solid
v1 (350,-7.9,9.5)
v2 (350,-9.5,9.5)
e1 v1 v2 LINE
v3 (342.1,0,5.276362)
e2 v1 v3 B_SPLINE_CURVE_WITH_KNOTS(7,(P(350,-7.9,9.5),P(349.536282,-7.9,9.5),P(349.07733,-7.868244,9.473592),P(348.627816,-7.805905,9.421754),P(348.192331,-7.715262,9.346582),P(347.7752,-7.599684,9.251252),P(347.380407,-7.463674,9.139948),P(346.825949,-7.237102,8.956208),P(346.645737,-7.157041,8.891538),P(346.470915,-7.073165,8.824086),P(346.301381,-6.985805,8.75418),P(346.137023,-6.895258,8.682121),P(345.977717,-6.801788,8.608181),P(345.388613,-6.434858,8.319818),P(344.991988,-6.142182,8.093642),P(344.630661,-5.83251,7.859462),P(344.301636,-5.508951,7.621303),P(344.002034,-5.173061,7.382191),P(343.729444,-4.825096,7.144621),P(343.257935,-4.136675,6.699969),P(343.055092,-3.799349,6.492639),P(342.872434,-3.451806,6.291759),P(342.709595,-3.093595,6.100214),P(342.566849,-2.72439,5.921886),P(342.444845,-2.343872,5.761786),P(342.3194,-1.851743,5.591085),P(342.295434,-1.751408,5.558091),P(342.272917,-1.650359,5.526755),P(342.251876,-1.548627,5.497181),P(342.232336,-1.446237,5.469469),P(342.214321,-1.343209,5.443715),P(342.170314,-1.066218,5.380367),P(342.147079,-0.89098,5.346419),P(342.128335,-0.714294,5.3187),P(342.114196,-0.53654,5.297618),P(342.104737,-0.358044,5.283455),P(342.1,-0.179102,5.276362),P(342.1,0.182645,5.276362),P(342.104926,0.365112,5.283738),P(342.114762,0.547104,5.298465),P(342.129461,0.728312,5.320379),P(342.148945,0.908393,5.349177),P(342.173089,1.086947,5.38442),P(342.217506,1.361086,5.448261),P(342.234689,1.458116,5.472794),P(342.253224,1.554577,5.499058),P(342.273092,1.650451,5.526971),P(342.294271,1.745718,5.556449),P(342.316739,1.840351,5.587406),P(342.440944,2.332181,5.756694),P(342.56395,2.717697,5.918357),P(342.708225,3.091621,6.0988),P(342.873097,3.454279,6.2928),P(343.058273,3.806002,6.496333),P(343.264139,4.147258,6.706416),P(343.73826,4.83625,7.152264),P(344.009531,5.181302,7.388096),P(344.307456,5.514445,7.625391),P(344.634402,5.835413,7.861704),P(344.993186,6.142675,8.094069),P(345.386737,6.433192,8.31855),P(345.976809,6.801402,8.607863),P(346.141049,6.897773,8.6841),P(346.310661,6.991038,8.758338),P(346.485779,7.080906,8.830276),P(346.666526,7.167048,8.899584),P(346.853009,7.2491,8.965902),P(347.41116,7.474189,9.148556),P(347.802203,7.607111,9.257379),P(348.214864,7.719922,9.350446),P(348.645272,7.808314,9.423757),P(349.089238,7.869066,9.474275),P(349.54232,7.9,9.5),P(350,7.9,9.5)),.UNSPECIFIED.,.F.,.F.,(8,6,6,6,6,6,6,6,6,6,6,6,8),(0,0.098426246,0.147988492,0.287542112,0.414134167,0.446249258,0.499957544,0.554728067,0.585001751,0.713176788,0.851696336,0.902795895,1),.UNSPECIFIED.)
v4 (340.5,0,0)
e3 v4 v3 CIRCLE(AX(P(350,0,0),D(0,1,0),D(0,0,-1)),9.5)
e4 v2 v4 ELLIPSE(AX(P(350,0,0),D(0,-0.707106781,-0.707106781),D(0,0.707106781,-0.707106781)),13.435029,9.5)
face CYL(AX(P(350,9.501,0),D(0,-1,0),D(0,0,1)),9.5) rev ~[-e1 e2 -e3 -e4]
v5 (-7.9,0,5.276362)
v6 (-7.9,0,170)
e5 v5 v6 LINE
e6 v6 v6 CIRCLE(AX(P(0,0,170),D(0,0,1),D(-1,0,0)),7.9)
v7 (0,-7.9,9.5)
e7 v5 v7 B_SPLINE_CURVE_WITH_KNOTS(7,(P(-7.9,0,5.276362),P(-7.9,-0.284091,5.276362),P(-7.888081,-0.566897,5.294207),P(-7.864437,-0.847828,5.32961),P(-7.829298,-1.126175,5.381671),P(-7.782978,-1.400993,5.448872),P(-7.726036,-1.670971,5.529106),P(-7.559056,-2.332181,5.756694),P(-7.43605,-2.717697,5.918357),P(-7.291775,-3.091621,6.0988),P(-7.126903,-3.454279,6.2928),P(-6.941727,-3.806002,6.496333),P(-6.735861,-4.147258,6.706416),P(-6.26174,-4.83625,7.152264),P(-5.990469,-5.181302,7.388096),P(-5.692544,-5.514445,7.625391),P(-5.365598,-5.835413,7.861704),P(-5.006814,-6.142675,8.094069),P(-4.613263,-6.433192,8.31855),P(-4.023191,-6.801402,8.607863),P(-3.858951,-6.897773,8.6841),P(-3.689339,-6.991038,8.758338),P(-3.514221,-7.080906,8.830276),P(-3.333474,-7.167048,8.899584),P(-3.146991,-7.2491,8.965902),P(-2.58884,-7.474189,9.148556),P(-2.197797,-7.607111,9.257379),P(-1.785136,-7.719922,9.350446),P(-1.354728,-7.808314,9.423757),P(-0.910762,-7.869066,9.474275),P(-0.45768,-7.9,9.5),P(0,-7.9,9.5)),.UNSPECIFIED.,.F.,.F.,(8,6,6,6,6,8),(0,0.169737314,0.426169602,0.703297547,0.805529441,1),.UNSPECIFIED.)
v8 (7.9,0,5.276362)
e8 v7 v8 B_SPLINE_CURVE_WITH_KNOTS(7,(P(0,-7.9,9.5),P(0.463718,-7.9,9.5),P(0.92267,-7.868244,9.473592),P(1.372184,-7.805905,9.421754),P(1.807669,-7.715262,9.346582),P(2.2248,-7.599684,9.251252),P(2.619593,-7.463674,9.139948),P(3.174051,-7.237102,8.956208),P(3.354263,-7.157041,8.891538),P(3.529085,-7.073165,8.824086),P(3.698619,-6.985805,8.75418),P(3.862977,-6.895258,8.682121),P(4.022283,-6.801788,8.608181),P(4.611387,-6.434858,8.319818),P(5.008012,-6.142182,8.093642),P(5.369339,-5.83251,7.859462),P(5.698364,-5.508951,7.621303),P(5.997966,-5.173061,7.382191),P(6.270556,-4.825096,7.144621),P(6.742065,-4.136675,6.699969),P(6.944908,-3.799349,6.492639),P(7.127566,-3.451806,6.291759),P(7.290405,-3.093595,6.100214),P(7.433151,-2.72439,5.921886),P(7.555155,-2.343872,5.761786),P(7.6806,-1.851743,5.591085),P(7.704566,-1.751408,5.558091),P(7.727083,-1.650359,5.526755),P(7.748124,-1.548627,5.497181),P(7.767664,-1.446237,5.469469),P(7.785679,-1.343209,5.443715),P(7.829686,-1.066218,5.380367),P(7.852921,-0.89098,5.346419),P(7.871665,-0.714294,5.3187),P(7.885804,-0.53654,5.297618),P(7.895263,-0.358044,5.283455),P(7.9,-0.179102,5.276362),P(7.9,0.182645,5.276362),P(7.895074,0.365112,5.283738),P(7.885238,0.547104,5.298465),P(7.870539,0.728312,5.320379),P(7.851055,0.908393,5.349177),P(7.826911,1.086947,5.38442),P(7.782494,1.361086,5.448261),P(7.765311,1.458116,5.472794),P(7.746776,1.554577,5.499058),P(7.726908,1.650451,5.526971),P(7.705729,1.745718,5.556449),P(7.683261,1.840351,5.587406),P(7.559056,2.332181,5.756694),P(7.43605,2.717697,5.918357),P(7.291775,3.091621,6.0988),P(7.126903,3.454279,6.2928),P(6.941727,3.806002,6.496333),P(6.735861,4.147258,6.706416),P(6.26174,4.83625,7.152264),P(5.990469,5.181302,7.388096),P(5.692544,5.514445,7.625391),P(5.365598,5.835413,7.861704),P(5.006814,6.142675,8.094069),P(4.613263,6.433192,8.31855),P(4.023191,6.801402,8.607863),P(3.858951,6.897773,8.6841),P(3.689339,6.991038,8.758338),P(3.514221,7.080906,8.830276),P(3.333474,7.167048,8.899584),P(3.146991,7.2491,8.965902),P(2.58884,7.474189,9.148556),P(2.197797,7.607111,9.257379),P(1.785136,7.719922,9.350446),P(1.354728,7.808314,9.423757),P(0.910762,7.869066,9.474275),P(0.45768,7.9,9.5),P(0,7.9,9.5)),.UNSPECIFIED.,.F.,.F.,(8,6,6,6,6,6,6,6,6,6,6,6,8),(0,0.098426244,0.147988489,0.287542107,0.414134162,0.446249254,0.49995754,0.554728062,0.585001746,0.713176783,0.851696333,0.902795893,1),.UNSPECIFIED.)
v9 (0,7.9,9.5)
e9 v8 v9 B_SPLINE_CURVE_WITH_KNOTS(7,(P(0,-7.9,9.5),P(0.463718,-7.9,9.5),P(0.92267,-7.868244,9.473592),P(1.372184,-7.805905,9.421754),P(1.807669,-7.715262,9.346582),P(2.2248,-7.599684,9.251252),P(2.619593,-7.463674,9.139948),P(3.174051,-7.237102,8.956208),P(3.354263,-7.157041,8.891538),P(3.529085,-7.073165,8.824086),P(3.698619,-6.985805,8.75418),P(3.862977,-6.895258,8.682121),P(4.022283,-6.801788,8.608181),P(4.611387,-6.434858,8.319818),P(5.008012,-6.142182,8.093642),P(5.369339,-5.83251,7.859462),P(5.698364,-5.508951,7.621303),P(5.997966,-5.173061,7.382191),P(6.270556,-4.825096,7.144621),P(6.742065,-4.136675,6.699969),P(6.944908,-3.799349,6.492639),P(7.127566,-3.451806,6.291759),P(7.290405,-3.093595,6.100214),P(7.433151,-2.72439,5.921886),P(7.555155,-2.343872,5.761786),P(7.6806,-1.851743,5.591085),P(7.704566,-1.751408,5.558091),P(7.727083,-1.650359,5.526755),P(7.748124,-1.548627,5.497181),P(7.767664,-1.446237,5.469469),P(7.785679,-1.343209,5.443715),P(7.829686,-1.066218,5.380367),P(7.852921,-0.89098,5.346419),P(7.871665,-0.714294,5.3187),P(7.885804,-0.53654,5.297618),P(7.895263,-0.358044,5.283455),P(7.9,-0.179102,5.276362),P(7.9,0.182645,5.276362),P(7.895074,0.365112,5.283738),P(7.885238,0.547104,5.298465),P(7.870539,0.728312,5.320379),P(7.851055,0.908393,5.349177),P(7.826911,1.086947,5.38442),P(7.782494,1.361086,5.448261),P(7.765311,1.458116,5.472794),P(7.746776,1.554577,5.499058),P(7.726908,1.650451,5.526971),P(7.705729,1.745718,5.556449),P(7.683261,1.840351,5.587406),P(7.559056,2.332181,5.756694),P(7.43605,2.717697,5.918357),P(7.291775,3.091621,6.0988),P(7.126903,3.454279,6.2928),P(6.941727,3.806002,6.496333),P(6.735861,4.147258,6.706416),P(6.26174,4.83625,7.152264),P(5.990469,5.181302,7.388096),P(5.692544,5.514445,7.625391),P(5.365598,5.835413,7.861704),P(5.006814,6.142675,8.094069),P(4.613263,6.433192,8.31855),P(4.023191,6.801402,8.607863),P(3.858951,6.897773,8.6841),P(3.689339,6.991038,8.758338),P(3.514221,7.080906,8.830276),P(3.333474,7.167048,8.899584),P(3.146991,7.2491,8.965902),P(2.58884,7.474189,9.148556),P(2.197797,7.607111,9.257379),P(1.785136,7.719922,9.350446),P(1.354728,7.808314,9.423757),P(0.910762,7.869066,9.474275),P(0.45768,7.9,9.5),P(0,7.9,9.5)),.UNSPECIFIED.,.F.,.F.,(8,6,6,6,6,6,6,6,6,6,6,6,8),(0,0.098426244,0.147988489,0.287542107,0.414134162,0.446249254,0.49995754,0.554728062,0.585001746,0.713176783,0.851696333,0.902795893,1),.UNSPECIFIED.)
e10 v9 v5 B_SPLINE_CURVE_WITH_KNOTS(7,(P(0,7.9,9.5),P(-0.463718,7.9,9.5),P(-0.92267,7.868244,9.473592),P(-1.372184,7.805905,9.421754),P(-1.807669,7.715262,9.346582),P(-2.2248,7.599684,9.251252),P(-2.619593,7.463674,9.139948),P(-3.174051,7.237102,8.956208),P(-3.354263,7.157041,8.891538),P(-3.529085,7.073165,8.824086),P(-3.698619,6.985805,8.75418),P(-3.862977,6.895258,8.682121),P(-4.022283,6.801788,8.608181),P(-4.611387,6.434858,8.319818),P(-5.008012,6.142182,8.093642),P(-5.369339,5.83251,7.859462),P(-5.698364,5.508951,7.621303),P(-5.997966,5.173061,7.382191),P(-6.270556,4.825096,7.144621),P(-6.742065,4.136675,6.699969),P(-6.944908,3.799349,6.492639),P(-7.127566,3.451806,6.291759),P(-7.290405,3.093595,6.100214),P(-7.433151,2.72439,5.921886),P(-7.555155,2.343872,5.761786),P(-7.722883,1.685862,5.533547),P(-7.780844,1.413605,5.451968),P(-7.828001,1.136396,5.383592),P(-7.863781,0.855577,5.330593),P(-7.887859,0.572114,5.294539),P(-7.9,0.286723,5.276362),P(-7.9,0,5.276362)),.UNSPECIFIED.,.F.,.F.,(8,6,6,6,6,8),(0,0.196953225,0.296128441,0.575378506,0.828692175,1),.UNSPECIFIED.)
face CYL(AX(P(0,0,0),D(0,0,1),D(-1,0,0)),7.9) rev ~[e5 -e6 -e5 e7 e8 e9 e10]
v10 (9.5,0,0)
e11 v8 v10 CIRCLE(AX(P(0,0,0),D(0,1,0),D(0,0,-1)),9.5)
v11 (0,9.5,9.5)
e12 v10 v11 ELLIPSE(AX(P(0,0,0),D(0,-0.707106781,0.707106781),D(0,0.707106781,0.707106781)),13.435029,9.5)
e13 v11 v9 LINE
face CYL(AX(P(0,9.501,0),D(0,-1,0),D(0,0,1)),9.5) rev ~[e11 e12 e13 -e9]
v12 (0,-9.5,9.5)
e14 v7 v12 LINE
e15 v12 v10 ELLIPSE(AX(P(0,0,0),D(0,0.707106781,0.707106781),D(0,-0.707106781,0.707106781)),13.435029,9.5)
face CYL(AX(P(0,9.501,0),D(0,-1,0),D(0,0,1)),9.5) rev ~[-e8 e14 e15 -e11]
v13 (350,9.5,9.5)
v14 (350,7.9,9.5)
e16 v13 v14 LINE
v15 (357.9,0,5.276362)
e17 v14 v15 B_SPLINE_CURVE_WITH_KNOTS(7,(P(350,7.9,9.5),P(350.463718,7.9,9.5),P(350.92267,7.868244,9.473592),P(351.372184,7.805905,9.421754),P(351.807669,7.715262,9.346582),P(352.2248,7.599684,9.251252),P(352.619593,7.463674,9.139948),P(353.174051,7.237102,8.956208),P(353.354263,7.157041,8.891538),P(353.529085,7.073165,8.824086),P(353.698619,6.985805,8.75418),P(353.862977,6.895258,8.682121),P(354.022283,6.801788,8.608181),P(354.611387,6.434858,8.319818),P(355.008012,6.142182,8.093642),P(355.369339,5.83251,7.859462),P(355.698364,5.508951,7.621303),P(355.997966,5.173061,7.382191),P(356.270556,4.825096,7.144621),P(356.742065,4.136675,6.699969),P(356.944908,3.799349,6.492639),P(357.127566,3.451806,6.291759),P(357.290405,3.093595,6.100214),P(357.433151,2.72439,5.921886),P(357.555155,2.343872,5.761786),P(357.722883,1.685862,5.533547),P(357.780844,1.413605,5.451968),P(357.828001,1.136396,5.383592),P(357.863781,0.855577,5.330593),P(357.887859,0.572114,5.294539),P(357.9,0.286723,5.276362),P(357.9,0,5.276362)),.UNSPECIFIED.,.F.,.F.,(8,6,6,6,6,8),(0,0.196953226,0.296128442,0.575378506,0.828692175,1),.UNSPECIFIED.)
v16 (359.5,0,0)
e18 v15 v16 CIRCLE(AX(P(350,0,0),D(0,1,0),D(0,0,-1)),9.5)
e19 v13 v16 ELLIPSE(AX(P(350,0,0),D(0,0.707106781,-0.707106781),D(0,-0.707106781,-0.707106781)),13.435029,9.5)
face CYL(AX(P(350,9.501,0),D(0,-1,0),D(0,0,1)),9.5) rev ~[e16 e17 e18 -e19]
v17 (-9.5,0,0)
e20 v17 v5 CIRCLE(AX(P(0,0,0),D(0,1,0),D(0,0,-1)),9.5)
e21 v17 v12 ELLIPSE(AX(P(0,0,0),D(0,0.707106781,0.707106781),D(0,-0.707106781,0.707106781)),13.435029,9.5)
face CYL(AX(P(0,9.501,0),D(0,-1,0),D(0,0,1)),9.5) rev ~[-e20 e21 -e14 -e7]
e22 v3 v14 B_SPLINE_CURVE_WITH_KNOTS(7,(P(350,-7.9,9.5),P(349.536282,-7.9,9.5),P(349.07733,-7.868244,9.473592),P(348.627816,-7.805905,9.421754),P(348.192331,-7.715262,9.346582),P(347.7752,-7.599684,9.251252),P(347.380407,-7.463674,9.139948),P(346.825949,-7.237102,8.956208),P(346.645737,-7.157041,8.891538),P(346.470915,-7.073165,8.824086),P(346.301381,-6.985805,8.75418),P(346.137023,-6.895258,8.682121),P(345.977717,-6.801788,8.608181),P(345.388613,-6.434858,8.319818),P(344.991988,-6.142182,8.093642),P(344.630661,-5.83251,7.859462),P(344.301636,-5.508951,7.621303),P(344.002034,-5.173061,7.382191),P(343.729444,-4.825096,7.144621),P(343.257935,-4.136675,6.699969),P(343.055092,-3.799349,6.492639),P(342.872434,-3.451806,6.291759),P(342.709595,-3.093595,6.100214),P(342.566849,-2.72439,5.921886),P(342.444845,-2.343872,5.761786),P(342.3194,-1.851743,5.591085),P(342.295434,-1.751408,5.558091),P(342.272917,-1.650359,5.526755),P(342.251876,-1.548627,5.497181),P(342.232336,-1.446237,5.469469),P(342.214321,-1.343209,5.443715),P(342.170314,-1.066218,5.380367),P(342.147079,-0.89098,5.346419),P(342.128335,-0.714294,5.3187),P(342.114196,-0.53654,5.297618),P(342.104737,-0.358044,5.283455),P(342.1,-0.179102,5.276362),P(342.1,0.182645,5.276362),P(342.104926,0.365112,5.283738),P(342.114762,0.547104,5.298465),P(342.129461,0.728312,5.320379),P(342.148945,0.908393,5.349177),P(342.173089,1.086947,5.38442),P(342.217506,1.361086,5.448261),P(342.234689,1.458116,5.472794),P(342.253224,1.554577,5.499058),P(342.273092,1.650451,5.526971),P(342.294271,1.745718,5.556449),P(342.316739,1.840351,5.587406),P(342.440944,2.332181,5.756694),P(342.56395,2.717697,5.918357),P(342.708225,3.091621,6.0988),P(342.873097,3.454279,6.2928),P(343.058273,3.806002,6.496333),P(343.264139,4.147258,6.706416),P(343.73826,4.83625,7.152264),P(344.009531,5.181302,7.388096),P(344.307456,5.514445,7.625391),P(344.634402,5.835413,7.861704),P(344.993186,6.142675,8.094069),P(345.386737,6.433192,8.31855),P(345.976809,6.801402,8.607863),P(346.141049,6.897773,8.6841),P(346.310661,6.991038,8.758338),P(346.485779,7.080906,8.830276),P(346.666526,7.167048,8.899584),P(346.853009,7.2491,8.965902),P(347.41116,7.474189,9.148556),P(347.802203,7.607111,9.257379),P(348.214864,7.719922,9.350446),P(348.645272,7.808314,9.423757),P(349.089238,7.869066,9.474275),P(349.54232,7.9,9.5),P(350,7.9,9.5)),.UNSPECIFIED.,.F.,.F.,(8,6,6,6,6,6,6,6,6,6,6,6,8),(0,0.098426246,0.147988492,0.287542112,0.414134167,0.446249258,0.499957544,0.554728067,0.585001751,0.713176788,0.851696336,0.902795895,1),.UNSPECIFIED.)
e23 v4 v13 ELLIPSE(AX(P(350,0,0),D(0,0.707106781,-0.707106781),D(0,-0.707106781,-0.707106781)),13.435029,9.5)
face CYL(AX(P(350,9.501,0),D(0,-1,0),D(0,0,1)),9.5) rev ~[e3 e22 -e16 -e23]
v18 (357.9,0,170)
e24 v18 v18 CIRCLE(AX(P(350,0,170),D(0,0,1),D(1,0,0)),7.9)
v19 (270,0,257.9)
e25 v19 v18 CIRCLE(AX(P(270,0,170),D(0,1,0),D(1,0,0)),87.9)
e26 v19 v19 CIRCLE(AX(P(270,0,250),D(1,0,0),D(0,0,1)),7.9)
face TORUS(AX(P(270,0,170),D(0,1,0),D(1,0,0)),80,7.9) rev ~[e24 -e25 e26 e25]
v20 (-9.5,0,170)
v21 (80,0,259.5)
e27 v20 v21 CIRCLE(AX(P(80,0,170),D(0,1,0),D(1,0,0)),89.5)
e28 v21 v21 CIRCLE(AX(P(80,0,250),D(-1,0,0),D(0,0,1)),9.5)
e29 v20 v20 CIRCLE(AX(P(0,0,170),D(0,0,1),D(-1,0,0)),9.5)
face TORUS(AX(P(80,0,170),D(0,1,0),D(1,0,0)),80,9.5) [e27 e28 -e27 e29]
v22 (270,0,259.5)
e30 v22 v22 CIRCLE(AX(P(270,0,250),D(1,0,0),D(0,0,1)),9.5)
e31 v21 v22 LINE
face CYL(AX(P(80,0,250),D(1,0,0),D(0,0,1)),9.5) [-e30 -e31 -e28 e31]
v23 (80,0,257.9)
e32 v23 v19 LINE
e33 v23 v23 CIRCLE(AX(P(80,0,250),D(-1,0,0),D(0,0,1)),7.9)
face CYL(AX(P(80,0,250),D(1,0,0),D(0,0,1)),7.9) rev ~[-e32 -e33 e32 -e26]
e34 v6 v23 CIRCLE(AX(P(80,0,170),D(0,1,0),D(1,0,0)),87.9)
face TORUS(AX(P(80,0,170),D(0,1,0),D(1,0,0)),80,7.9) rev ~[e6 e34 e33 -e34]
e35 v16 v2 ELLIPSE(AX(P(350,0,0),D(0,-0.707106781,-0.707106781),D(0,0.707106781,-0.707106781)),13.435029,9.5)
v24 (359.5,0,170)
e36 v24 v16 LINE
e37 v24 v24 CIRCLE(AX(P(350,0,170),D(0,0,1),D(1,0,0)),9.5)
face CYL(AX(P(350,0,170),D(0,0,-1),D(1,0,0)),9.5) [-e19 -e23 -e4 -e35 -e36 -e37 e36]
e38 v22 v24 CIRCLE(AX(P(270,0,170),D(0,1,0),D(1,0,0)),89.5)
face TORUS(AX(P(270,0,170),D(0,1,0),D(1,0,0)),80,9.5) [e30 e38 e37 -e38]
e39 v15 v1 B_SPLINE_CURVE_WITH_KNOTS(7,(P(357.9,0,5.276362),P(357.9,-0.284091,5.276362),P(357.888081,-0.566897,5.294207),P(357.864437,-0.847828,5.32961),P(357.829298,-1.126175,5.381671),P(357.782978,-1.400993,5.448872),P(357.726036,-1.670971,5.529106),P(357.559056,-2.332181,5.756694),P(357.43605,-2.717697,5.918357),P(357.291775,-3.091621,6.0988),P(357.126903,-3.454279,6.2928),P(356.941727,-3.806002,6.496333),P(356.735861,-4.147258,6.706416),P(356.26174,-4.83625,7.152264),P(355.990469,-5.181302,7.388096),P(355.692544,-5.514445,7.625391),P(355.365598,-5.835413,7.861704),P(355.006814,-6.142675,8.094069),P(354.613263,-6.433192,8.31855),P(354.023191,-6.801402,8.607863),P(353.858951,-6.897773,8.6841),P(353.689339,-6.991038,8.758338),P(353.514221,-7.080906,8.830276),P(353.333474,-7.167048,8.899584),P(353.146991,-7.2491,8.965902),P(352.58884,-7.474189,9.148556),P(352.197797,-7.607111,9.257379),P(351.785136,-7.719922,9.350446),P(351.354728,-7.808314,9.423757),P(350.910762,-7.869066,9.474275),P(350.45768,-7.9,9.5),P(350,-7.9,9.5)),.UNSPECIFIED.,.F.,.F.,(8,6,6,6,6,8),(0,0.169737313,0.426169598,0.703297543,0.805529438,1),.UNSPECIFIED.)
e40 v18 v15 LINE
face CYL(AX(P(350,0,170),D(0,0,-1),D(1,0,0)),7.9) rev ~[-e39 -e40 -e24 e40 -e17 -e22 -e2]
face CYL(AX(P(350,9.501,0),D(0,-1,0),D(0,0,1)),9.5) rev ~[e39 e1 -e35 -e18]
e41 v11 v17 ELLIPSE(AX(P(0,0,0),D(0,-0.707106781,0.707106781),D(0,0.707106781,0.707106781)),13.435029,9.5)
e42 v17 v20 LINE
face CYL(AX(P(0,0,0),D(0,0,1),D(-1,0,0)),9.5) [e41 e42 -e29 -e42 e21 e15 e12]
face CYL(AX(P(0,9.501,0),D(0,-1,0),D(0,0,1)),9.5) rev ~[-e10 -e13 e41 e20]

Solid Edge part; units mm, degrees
sketch "Sketch1" plane through (0, 0, 0) normal (0, -1, 0) x (1, 0, 0)
  line L0 (0, 0) -> (0, 170)
  arc A0 (0, 170) -> (80, 250) centre (80, 170) cw
  line L1 (80, 250) -> (270, 250)
  arc A1 (270, 250) -> (350, 170) centre (270, 170) cw
  line L2 (350, 170) -> (350, 0)
  dimension "D1" = 350
  dimension "D2" = 80
  dimension "D3" = 250
sketch "Sketch2" plane through (0, 0, 0) normal (0, 0, -1) x (-1, 0, 0)
  circle A0 centre (0, 0) radius 9.5
  dimension "D1" = 19
sweep "SweptProtrusion_1" add profiles "Sketch2" path "Sketch1"
shell "Thinwall_1" thickness 1.6 removed faces 4 at (6.5233, -6.1433, 0) at (343.4767, -6.1433, 0) at (6.5233, -6.1433, 0) at (343.4767, -6.1433, 0)
hole "Hole_1" at (0, 0, 0) direction (0, -1, 0) diameter 19 end through all both ways yes
hole "Hole1" at (350, 0, 0) direction (0, -1, 0) diameter 19 end through all both ways yes
properties material "Aluminum, 1060"
